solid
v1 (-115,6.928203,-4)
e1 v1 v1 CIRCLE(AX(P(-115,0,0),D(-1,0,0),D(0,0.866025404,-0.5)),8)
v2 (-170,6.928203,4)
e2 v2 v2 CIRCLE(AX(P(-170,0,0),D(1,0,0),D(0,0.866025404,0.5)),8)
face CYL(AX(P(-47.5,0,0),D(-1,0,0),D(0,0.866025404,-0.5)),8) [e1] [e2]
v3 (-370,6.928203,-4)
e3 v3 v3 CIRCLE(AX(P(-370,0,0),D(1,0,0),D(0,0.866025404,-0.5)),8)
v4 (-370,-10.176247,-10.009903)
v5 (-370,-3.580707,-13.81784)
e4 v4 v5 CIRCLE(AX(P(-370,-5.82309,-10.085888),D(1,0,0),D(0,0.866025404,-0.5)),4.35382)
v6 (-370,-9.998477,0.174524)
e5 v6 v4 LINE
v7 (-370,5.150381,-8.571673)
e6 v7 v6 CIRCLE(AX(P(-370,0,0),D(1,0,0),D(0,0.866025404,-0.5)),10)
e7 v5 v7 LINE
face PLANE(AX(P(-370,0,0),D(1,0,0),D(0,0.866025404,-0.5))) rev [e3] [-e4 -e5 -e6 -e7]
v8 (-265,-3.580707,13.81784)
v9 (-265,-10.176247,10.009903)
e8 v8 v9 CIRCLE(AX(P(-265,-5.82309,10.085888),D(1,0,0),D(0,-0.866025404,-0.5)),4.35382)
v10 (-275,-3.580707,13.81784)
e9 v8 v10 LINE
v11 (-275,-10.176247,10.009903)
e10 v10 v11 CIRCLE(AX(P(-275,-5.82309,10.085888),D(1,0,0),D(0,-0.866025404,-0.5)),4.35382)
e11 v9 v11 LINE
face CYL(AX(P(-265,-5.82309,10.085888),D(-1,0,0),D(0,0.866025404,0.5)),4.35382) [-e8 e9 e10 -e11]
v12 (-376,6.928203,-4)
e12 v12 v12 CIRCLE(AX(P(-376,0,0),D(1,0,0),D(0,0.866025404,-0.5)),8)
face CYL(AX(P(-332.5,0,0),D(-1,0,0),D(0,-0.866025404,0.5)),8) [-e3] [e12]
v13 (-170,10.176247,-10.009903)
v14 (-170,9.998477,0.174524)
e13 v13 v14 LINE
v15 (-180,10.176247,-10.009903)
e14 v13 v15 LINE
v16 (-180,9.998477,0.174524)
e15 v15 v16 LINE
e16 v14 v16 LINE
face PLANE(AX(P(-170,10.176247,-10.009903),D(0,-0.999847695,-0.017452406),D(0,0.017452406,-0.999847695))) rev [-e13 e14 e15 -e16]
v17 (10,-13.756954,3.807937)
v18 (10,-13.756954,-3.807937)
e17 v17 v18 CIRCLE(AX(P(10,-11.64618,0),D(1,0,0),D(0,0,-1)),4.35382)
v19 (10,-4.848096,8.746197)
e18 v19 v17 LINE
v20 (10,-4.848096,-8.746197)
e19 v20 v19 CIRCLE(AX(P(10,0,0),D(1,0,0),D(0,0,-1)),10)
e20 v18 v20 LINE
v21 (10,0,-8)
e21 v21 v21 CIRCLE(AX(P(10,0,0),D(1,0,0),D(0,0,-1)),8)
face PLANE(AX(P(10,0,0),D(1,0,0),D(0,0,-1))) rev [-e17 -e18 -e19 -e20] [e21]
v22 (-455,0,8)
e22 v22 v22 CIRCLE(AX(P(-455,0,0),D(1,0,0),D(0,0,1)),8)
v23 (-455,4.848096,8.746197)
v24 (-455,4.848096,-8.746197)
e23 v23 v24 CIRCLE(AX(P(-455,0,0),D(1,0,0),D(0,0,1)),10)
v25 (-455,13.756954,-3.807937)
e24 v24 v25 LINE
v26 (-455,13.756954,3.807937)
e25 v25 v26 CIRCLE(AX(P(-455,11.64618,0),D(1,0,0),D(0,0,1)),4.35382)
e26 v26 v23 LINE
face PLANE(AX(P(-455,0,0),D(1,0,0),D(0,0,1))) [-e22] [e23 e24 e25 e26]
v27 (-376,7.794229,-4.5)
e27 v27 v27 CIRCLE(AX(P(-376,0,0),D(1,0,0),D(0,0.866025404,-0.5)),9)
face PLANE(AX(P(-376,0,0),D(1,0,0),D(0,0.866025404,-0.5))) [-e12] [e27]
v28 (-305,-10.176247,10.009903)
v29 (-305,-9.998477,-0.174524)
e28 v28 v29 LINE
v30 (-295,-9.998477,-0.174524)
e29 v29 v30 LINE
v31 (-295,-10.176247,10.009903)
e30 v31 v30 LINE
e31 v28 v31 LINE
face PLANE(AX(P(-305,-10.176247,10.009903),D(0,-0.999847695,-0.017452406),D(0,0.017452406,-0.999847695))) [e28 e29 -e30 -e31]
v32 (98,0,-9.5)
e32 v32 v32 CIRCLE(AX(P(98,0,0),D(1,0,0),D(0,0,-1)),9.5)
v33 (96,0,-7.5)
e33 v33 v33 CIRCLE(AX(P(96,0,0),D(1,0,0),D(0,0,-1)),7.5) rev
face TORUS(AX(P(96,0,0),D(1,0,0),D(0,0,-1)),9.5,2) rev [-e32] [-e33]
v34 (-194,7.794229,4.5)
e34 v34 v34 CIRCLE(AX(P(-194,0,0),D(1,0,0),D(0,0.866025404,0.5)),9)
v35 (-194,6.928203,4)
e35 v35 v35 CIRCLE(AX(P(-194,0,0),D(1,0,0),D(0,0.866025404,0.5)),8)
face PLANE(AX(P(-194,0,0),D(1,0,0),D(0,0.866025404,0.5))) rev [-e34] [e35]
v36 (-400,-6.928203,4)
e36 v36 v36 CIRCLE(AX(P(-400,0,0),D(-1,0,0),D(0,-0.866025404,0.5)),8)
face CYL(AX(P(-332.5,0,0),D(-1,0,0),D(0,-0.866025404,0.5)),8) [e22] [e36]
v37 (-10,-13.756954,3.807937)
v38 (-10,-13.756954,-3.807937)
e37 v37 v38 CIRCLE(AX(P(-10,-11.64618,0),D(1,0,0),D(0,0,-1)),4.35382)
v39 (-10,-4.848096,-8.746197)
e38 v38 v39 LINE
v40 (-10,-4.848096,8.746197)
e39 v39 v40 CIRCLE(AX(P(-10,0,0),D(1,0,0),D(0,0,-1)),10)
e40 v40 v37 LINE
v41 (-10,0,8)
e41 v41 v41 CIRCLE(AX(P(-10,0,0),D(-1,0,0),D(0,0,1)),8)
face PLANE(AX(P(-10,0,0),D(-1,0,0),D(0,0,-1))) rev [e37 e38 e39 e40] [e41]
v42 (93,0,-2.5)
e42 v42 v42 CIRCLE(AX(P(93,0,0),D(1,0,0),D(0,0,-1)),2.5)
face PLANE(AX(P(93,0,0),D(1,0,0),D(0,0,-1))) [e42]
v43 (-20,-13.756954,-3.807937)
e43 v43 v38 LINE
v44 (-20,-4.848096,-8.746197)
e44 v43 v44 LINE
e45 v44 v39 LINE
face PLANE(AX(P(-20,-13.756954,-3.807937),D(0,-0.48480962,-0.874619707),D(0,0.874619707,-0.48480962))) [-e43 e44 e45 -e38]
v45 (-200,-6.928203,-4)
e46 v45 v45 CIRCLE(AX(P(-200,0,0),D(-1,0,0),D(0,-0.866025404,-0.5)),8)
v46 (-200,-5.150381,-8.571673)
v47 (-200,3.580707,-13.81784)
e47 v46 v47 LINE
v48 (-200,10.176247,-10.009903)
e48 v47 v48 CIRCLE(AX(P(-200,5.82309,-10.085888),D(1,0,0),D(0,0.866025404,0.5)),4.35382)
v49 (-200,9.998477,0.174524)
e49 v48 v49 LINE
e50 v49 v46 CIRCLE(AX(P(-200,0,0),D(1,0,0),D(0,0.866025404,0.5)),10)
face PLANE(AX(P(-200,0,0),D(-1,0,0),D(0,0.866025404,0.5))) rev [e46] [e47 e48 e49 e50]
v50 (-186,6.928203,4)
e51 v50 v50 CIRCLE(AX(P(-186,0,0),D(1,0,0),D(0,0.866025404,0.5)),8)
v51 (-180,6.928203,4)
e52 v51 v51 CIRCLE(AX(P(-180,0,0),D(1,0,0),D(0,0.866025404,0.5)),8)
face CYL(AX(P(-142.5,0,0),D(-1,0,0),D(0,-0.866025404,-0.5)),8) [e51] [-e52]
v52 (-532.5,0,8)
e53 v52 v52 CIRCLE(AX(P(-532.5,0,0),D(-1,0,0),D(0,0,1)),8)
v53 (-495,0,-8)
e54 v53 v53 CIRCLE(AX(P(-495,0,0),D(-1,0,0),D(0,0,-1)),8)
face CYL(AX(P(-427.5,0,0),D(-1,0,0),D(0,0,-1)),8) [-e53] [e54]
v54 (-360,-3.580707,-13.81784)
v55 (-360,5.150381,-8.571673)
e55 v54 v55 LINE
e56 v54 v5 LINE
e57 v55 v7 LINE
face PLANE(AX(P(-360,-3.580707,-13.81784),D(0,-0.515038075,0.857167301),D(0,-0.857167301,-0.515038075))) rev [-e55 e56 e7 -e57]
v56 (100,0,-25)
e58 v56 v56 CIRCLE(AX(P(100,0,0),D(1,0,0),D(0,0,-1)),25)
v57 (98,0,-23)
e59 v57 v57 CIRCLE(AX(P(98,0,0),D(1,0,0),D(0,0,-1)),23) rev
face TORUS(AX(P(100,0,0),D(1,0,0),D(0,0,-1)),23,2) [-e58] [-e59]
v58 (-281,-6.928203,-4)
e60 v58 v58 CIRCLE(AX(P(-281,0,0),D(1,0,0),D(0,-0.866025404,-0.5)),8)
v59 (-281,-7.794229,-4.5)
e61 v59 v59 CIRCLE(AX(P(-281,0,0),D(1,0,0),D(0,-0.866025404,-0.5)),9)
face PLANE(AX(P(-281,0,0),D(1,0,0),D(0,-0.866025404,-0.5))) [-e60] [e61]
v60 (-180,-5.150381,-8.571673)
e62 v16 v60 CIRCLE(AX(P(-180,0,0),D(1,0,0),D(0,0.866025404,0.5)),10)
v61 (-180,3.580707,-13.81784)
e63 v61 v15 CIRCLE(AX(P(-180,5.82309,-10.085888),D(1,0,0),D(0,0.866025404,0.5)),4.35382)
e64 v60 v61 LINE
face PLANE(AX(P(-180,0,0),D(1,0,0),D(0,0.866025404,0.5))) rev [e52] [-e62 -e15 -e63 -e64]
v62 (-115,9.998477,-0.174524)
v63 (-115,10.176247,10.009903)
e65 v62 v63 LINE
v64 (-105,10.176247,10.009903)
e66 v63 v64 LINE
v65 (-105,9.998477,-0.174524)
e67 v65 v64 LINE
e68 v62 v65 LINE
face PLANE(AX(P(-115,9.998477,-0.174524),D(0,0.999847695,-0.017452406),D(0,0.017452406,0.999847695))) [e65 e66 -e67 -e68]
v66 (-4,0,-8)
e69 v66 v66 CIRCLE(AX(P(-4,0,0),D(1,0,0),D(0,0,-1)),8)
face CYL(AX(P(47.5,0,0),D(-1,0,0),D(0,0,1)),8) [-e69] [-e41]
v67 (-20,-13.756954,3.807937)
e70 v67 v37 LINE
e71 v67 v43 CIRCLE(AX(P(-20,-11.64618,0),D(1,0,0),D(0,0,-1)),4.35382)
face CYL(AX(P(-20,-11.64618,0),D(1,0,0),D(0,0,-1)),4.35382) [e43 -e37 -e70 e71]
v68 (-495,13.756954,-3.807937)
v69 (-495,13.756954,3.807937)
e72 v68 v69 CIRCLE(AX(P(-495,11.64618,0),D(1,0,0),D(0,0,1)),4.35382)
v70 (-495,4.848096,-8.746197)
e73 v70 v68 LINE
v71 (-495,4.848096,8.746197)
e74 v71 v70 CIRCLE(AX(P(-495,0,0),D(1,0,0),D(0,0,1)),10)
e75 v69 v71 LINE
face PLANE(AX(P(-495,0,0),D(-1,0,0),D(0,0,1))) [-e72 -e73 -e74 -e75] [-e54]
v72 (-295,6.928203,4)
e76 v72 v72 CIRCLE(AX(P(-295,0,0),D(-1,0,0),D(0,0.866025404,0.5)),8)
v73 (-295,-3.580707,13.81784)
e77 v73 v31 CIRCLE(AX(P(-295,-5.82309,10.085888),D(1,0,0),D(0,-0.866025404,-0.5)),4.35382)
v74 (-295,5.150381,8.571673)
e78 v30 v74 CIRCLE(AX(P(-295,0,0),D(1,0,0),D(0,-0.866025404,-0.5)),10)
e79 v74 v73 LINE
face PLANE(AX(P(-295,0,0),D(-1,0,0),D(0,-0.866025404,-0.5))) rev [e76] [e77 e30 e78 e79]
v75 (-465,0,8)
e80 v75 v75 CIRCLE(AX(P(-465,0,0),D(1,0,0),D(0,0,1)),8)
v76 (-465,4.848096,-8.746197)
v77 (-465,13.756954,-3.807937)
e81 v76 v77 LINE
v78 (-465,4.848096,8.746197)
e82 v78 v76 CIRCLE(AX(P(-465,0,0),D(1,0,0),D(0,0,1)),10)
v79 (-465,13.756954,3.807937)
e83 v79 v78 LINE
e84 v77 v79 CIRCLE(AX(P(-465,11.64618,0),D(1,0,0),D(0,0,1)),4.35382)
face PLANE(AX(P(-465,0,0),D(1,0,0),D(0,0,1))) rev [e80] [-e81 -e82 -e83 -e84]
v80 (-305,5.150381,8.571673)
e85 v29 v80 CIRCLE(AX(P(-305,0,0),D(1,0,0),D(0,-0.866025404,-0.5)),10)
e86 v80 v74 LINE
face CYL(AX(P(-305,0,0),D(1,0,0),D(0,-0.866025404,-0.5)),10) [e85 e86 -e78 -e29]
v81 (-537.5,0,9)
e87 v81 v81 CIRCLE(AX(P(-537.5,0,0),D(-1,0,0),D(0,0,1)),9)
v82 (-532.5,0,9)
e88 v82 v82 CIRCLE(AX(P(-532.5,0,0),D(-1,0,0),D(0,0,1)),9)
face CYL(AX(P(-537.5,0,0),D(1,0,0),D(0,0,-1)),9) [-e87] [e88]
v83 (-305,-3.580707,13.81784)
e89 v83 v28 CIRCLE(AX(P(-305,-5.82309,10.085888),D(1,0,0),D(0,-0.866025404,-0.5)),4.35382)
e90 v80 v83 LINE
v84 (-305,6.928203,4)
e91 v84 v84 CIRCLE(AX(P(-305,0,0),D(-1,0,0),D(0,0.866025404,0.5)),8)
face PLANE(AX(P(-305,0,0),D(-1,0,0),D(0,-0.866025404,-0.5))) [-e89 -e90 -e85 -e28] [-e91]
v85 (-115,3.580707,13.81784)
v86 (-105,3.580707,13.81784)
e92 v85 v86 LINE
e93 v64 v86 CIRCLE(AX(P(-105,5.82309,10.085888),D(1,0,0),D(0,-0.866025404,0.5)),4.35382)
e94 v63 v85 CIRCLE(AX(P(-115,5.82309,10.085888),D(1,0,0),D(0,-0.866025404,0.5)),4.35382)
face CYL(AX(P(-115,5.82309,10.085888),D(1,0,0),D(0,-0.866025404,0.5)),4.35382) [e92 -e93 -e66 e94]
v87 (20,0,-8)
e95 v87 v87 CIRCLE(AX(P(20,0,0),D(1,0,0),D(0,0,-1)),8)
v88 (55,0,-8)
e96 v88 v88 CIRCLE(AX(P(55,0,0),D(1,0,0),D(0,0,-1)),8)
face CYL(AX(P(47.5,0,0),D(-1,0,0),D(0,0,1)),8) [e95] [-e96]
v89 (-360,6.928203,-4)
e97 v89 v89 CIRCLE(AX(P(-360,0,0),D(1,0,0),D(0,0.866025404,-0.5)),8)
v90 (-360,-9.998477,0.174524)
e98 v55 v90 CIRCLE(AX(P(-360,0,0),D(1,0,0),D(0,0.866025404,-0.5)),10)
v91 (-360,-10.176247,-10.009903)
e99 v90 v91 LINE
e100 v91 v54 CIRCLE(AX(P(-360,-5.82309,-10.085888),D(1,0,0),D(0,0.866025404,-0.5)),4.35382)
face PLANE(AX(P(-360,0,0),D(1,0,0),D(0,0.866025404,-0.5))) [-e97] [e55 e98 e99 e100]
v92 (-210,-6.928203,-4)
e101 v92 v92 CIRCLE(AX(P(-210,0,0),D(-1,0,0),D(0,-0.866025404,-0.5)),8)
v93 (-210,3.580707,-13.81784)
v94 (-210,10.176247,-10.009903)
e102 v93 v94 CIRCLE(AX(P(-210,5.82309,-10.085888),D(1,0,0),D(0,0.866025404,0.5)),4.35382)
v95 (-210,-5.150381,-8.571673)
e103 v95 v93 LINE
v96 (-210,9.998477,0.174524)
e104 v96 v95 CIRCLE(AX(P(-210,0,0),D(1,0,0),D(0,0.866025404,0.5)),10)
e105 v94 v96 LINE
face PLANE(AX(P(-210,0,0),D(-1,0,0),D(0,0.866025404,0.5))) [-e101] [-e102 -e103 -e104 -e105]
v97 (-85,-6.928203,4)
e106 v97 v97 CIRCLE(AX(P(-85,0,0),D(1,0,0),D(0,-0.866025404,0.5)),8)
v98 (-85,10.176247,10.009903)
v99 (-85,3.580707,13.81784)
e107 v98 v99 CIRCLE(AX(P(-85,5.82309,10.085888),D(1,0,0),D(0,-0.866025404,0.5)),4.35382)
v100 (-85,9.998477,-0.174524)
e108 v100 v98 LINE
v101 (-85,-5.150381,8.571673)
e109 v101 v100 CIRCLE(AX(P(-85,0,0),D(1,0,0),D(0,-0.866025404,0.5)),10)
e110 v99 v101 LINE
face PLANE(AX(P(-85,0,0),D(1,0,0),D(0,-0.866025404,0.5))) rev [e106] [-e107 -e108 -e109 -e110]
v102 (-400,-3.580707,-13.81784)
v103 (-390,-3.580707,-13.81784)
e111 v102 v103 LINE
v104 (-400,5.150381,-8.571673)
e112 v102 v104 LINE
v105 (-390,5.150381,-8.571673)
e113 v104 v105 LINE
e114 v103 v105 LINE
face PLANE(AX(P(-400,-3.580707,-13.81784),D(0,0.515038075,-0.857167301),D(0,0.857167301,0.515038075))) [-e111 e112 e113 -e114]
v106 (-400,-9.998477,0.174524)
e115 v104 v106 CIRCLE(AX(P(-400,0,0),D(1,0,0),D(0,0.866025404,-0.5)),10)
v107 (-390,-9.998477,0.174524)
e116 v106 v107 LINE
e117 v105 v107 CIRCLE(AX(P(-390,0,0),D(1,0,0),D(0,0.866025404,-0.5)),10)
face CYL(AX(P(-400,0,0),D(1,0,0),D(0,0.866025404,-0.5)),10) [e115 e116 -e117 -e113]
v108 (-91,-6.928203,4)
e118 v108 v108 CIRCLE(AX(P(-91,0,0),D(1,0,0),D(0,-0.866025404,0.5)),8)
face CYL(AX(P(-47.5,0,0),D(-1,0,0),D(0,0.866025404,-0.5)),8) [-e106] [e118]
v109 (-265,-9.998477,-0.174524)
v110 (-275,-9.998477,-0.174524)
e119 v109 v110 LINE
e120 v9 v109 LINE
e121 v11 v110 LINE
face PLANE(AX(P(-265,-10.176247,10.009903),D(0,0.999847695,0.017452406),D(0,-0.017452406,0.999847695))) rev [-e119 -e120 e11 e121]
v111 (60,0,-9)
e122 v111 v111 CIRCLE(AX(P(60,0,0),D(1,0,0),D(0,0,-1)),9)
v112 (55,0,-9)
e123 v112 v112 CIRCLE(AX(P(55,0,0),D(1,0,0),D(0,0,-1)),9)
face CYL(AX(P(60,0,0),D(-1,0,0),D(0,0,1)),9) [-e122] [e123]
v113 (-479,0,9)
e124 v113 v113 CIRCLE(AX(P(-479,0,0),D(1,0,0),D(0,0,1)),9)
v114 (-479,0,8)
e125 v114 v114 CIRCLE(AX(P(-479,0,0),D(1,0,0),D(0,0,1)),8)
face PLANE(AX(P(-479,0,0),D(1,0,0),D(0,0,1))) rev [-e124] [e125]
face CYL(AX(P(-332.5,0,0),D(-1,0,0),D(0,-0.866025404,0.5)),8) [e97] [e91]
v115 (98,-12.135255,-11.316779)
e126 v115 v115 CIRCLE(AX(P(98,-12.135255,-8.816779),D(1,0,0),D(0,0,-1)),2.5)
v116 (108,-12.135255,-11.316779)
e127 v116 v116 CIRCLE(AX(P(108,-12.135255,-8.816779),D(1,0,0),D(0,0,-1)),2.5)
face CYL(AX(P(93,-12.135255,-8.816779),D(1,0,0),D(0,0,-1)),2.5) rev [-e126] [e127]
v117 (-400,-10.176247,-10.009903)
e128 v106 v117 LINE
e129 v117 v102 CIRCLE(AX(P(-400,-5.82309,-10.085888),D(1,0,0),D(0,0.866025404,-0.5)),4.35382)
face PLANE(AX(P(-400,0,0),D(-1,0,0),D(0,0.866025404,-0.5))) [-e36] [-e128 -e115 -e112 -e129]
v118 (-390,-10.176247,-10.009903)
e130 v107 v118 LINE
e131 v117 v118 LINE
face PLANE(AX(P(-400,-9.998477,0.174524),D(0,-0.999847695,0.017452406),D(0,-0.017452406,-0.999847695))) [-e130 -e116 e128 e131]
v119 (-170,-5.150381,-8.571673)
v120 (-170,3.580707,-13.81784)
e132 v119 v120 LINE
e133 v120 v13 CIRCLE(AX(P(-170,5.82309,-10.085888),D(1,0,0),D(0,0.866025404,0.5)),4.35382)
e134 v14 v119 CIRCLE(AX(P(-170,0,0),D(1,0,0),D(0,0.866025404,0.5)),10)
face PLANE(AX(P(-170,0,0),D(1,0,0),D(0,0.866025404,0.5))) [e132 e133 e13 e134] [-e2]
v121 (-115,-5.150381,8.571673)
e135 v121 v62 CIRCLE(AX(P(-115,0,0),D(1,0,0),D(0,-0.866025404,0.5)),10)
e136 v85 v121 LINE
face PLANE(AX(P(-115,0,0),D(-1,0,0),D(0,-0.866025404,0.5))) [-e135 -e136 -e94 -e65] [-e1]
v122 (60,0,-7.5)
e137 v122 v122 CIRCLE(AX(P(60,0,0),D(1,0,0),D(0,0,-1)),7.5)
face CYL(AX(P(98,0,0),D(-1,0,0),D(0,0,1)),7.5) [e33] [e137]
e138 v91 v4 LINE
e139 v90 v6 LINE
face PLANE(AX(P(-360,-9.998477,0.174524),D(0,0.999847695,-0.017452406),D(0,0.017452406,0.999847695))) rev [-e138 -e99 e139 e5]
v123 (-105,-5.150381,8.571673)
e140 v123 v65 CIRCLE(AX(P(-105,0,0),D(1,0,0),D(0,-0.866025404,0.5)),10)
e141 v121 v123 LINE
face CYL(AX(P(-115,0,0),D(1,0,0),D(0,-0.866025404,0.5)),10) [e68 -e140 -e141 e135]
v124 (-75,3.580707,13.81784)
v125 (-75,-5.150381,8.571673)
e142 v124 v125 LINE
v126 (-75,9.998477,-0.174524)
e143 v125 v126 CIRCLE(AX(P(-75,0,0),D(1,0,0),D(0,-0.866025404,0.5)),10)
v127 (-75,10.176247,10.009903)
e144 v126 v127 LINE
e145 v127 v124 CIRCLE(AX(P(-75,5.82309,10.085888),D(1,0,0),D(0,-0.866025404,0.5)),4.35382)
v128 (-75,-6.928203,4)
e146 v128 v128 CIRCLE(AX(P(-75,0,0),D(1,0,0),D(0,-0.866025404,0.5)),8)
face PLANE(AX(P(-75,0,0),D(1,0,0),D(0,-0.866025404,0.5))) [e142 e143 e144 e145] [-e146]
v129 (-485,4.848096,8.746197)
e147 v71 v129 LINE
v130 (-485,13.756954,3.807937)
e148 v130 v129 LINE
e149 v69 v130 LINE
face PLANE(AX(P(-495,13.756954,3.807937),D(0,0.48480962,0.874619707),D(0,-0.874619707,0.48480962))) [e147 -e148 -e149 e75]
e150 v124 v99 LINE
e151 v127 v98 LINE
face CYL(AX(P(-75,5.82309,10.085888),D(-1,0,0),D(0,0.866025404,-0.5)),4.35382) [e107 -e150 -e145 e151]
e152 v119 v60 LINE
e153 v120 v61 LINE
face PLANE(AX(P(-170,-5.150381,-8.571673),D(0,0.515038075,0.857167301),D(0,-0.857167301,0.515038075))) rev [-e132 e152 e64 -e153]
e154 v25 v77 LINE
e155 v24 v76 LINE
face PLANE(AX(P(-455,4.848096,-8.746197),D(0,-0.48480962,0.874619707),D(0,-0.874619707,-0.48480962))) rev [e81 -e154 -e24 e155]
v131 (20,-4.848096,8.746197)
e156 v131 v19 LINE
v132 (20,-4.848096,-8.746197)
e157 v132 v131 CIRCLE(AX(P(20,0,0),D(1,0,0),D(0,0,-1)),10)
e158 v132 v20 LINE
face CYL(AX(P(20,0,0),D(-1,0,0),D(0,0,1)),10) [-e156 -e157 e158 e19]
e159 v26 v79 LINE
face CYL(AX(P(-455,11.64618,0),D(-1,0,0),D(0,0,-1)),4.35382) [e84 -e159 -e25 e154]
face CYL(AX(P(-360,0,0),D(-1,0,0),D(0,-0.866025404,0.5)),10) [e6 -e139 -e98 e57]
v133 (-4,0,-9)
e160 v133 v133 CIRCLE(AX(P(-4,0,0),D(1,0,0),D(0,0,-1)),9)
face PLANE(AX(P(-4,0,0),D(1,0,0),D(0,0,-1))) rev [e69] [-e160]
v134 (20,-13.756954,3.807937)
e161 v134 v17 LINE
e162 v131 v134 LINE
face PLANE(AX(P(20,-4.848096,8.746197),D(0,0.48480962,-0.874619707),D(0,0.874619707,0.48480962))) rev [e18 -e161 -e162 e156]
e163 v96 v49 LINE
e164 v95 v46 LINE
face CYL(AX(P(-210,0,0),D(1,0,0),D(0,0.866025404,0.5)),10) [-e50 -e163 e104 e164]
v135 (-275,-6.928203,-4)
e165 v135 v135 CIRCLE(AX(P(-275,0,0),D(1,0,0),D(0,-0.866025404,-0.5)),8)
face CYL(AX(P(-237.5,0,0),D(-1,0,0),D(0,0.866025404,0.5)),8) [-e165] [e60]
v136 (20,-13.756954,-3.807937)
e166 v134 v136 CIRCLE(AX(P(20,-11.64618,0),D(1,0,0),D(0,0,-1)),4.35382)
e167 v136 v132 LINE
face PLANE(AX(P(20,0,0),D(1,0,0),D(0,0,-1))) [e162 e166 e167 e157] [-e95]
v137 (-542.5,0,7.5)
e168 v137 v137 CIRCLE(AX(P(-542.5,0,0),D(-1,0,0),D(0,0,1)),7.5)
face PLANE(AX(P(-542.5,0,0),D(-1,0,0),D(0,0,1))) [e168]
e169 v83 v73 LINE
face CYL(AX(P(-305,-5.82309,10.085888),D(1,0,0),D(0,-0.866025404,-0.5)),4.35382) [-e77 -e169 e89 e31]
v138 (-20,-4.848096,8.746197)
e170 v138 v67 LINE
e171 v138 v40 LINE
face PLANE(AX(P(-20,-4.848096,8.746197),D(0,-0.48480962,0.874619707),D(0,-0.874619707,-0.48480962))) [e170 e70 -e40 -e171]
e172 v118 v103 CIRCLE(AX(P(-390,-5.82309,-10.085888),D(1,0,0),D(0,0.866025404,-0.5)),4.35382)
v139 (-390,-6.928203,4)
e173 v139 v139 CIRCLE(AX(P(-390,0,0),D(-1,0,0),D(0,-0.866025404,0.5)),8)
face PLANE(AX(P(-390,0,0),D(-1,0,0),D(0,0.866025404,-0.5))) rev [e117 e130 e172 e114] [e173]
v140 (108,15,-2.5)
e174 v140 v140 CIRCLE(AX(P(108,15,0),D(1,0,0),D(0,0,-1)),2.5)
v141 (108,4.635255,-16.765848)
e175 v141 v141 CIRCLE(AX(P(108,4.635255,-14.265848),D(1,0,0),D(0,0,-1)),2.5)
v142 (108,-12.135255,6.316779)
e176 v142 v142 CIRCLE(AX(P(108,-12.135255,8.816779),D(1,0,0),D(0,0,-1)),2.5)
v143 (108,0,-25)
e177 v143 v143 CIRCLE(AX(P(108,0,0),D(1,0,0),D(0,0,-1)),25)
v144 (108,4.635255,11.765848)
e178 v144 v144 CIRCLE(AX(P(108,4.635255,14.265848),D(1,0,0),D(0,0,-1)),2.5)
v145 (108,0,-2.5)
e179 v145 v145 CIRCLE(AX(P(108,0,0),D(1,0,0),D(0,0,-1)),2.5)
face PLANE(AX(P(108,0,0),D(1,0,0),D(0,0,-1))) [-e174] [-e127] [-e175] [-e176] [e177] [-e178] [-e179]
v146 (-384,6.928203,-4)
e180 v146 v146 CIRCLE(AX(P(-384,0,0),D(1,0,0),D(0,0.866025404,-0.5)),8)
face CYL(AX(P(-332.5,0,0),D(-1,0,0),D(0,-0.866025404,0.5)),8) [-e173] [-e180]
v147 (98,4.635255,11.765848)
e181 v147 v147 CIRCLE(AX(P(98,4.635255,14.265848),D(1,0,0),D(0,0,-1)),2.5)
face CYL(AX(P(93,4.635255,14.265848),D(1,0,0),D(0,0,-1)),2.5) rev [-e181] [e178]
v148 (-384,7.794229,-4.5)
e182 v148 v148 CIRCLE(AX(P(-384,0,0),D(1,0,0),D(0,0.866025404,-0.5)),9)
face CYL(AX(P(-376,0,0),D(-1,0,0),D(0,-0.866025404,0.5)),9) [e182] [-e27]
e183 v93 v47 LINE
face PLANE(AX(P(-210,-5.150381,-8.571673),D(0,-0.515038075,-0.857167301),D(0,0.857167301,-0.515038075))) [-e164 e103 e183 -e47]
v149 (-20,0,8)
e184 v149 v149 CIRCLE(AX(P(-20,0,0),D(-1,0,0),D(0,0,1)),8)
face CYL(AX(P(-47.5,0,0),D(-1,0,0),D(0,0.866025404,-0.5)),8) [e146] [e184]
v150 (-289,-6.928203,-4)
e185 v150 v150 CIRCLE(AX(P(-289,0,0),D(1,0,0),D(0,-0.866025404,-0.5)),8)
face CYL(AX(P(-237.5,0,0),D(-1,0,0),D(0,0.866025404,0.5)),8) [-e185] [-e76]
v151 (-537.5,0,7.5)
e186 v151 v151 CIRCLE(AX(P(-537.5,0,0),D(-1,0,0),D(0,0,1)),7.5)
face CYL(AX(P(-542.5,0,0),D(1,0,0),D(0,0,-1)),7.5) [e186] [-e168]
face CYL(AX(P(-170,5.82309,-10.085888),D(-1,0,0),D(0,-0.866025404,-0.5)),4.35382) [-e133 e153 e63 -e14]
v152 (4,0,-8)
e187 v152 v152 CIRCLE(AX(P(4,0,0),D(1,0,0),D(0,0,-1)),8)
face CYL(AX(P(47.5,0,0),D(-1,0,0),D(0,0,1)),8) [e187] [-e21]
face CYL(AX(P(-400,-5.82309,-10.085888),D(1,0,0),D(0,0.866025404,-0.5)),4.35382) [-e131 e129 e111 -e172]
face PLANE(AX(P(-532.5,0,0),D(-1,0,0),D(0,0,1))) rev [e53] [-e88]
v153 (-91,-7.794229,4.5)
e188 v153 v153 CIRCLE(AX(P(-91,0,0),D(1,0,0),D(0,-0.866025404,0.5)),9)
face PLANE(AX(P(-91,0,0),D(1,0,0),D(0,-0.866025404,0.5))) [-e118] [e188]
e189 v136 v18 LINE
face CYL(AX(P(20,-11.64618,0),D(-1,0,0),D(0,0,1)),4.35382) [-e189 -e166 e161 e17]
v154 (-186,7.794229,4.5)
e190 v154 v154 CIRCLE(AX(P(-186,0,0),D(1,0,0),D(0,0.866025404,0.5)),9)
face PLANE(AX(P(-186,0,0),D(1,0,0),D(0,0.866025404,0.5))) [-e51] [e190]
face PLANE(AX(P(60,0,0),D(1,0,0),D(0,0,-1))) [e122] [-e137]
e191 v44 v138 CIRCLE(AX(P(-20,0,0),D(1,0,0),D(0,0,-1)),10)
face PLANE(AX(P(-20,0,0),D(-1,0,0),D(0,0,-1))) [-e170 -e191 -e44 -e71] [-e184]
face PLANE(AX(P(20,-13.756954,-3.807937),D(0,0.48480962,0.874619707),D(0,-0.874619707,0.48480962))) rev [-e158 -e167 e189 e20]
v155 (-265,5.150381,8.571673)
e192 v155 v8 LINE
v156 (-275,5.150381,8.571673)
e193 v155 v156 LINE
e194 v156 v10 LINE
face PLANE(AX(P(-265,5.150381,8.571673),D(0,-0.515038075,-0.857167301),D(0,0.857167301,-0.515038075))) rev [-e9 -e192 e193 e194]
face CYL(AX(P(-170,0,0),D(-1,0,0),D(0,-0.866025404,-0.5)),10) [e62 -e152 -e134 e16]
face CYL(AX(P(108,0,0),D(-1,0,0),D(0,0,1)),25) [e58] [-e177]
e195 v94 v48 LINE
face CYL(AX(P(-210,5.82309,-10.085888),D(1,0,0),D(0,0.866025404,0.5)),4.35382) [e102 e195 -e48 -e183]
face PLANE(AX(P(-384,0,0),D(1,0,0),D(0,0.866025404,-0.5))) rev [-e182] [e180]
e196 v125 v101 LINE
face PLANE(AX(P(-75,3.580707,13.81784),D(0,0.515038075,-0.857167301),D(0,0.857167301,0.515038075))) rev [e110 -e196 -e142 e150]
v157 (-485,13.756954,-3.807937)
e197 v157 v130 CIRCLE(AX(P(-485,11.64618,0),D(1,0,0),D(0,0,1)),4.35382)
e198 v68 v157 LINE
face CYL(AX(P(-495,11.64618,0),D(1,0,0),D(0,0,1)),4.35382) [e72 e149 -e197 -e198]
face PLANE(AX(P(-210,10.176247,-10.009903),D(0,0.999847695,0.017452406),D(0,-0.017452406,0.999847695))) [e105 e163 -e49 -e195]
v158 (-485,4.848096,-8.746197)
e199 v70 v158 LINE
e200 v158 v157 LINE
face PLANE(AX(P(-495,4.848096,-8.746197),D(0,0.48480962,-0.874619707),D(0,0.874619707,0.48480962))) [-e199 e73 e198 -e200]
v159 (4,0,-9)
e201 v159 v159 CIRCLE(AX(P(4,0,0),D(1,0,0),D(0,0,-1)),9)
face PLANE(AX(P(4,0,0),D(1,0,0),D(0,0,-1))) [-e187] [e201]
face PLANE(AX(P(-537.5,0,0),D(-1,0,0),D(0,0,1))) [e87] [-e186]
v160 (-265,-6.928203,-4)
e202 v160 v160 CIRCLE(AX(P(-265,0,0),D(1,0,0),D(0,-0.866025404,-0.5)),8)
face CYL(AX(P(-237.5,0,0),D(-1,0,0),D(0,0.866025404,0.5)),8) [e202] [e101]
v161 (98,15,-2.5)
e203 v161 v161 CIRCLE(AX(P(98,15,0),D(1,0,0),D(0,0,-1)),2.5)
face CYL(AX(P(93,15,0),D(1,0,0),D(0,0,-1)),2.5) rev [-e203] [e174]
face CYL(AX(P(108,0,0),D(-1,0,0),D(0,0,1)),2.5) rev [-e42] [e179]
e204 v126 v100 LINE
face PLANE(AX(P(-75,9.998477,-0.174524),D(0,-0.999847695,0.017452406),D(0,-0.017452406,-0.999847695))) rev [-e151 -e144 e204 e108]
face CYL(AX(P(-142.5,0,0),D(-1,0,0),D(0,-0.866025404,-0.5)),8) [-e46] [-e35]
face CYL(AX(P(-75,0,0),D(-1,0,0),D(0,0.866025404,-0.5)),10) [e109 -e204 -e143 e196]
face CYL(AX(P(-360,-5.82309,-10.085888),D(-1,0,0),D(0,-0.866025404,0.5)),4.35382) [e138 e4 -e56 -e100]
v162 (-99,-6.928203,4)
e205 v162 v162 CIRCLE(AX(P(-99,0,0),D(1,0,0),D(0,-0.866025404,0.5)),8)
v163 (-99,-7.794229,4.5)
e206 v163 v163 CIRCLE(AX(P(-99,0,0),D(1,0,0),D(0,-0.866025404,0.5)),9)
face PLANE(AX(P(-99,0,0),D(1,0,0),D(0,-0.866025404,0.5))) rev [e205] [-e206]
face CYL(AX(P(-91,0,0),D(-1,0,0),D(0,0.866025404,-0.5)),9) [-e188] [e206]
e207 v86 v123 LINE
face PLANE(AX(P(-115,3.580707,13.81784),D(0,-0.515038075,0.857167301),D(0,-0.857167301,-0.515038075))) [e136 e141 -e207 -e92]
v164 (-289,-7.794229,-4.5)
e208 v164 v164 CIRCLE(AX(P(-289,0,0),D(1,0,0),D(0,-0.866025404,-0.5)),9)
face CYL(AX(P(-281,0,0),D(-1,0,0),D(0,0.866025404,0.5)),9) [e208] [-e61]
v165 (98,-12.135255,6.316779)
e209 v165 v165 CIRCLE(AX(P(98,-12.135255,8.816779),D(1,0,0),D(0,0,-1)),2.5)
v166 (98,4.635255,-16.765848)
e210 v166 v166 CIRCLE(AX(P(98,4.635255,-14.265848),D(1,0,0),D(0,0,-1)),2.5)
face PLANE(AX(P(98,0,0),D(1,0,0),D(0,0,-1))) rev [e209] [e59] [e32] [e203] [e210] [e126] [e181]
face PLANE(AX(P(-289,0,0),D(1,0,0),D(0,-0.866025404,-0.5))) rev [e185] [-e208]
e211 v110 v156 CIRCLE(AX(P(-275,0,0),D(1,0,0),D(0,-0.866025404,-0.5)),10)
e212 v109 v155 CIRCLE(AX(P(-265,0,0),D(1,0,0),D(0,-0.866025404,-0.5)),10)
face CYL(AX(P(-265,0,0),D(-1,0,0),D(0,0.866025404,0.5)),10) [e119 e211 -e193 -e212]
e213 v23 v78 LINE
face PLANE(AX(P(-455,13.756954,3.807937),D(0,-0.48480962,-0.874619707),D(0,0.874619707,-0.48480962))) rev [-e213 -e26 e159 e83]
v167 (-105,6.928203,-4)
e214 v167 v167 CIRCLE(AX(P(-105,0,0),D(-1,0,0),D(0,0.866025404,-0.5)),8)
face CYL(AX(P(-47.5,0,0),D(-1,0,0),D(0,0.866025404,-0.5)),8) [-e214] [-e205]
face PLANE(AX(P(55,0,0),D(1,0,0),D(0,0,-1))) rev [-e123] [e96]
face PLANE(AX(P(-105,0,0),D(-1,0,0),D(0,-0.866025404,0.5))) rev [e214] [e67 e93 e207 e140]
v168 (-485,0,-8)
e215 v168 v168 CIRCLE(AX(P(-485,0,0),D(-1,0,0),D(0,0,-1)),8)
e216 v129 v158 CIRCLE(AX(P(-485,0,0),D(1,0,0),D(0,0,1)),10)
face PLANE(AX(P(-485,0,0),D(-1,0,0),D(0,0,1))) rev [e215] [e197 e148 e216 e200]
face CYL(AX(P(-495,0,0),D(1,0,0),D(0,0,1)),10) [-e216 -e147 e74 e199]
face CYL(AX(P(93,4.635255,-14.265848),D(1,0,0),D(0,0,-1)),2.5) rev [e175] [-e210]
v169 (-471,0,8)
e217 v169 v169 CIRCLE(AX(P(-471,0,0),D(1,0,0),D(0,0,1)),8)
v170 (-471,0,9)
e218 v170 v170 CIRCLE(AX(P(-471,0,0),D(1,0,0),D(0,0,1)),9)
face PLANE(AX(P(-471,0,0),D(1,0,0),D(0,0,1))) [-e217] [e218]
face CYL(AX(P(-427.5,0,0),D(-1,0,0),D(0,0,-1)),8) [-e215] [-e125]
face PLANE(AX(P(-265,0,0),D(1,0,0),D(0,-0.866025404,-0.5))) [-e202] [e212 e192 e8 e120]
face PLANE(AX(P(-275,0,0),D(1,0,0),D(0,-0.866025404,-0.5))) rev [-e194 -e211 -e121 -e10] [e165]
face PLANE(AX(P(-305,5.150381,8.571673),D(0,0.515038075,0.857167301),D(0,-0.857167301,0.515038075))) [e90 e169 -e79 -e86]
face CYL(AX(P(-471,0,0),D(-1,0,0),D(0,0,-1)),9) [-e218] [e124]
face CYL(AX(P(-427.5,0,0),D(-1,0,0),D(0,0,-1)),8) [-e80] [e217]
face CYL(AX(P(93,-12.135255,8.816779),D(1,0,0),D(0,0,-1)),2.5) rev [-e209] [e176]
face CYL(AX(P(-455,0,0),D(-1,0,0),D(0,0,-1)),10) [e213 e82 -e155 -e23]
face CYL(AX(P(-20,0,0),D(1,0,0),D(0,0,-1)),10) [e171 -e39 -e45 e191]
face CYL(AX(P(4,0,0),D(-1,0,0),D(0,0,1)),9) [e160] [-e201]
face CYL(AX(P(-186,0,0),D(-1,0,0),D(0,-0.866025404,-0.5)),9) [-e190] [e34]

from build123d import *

# Parameters (mm, degrees)
SKETCH1_R             = 8
BOSS_EXTRUDE1_DEPTH   = 47.5
BOSS_EXTRUDE2_START   = 10
BOSS_EXTRUDE2_DEPTH   = 10
SKETCH3_R             = 9
BOSS_EXTRUDE3_DEPTH   = 4
LPATTERN1_COUNT       = 6
LPATTERN1_PITCH       = 95
BODY_MOVE_COPY1_ANGLE = 60
BODY_MOVE_COPY2_ANGLE = 120
BODY_MOVE_COPY3_ANGLE = 60
BODY_MOVE_COPY4_ANGLE = 120
BODY_MOVE_COPY5_ANGLE = 180
SKETCH4_R             = 8
BOSS_EXTRUDE4_DEPTH   = 10
SKETCH5_R             = 9
BOSS_EXTRUDE5_DEPTH   = 5
SKETCH6_R             = 7.5
BOSS_EXTRUDE6_DEPTH   = 5
SKETCH7_R             = 8
BOSS_EXTRUDE7_DEPTH   = 7.5
SKETCH8_R             = 9
BOSS_EXTRUDE8_DEPTH   = 5
SKETCH9_R             = 7.5
BOSS_EXTRUDE9_DEPTH   = 38
SKETCH10_R            = 25
SKETCH10_R_2          = 2.5
BOSS_EXTRUDE10_DEPTH  = 10
SKETCH11_R            = 2.5
CUT_EXTRUDE1_DEPTH    = 15
FILLET1_R             = 2


with BuildPart() as part:
    # Sketch1 → Boss-Extrude1 (new, symmetric)
    with BuildSketch(Plane(origin=(0, 0, 0), x_dir=(0, 0, -1), z_dir=(1, 0, 0))):
        Circle(SKETCH1_R)
    extrude(amount=BOSS_EXTRUDE1_DEPTH, both=True)

    # Sketch2 → Boss-Extrude2 (add)
    with BuildSketch(Plane(origin=(0, 0, 0), x_dir=(0, 0, -1), z_dir=(1, 0, 0)).offset(BOSS_EXTRUDE2_START)):
        with BuildLine():
            Line((-8.746197071, -4.848096202), (-3.807936598, -13.756953924))
            ThreePointArc((-3.807936598, -13.756953924), (0, -16), (3.807936598, -13.756953924))
            Line((3.807936598, -13.756953924), (8.746197071, -4.848096202))
            ThreePointArc((8.746197071, -4.848096202), (0, 10), (-8.746197071, -4.848096202))
        make_face()
    boss_extrude2 = extrude(amount=BOSS_EXTRUDE2_DEPTH)

    # Mirror1: Boss-Extrude2 across plane
    add(boss_extrude2.mirror(Plane(origin=(0, 0, 0), x_dir=(0, 0, 1), z_dir=(1, 0, 0))))

    # Sketch3 → Boss-Extrude3 (add, symmetric)
    with BuildSketch(Plane(origin=(0, 0, 0), x_dir=(0, 0, -1), z_dir=(1, 0, 0))):
        Circle(SKETCH3_R)
    extrude(amount=BOSS_EXTRUDE3_DEPTH, both=True)


with BuildPart() as lpattern1_1:
    # LPattern1: pattern copy
    add(part.part.moved(Location(Vector(-1, 0, 0) * (1 * LPATTERN1_PITCH))))


with BuildPart() as lpattern1_2:
    # LPattern1: pattern copy
    add(part.part.moved(Location(Vector(-1, 0, 0) * (2 * LPATTERN1_PITCH))))


with BuildPart() as lpattern1_3:
    # LPattern1: pattern copy
    add(part.part.moved(Location(Vector(-1, 0, 0) * (3 * LPATTERN1_PITCH))))


with BuildPart() as lpattern1_4:
    # LPattern1: pattern copy
    add(part.part.moved(Location(Vector(-1, 0, 0) * (4 * LPATTERN1_PITCH))))


with BuildPart() as lpattern1_5:
    # LPattern1: pattern copy
    add(part.part.moved(Location(Vector(-1, 0, 0) * (5 * LPATTERN1_PITCH))))


with BuildPart() as lpattern1_3_1:
    # Body-Move/Copy1: moved
    add(lpattern1_3.part.rotate(Axis((0, 0, 0), (-1, 0, 0)), BODY_MOVE_COPY1_ANGLE))


with BuildPart() as lpattern1_1_1:
    # Body-Move/Copy2: moved
    add(lpattern1_1.part.rotate(Axis((0, 0, 0), (-1, 0, 0)), BODY_MOVE_COPY2_ANGLE))


with BuildPart() as lpattern1_4_1:
    # Body-Move/Copy3: moved
    add(lpattern1_4.part.rotate(Axis((0, 0, 0), (1, 0, 0)), BODY_MOVE_COPY3_ANGLE))


with BuildPart() as lpattern1_2_1:
    # Body-Move/Copy4: moved
    add(lpattern1_2.part.rotate(Axis((0, 0, 0), (1, 0, 0)), BODY_MOVE_COPY4_ANGLE))


with BuildPart() as lpattern1_5_1:
    # Body-Move/Copy5: moved
    add(lpattern1_5.part.rotate(Axis((0, 0, 0), (1, 0, 0)), BODY_MOVE_COPY5_ANGLE))

    # Sketch4 → Boss-Extrude4 (add)
    with BuildSketch(Plane.ZY.offset(522.5)):
        Circle(SKETCH4_R)
    extrude(amount=BOSS_EXTRUDE4_DEPTH)

    # Sketch5 → Boss-Extrude5 (add)
    with BuildSketch(Plane.ZY.offset(532.5)):
        Circle(SKETCH5_R)
    extrude(amount=BOSS_EXTRUDE5_DEPTH)


with BuildPart() as lpattern1_4_2:
    add(lpattern1_4_1.part)

    # Combine1: union LPattern1_1, LPattern1_3, LPattern1_2, part, LPattern1_5
    add(lpattern1_1_1.part)
    add(lpattern1_3_1.part)
    add(lpattern1_2_1.part)
    add(part.part)
    add(lpattern1_5_1.part)

    # Sketch6 → Boss-Extrude6 (add)
    with BuildSketch(Plane.ZY.offset(537.5)):
        Circle(SKETCH6_R)
    extrude(amount=BOSS_EXTRUDE6_DEPTH)

    # Sketch7 → Boss-Extrude7 (add)
    with BuildSketch(Plane(origin=(47.5, 0, 0), x_dir=(0, 0, -1), z_dir=(1, 0, 0))):
        Circle(SKETCH7_R)
    extrude(amount=BOSS_EXTRUDE7_DEPTH)

    # Sketch8 → Boss-Extrude8 (add)
    with BuildSketch(Plane(origin=(55, 0, 0), x_dir=(0, 0, -1), z_dir=(1, 0, 0))):
        Circle(SKETCH8_R)
    extrude(amount=BOSS_EXTRUDE8_DEPTH)

    # Sketch9 → Boss-Extrude9 (add)
    with BuildSketch(Plane(origin=(60, 0, 0), x_dir=(0, 0, -1), z_dir=(1, 0, 0))):
        Circle(SKETCH9_R)
    extrude(amount=BOSS_EXTRUDE9_DEPTH)

    # Sketch10 → Boss-Extrude10 (add)
    with BuildSketch(Plane(origin=(98, 0, 0), x_dir=(0, 0, -1), z_dir=(1, 0, 0))):
        Circle(SKETCH10_R)
        Circle(SKETCH10_R_2, mode=Mode.SUBTRACT)
    extrude(amount=BOSS_EXTRUDE10_DEPTH)

    # Sketch11 → Cut-Extrude1 (cut)
    with BuildSketch(Plane(origin=(108, 0, 0), x_dir=(0, 0, -1), z_dir=(1, 0, 0))):
        with Locations((0, 15)):
            Circle(SKETCH11_R)
        Circle(SKETCH11_R)
        with Locations((14.265847744, 4.635254916)):
            Circle(SKETCH11_R)
        with Locations((8.816778784, -12.135254916)):
            Circle(SKETCH11_R)
        with Locations((-8.816778784, -12.135254916)):
            Circle(SKETCH11_R)
        with Locations((-14.265847744, 4.635254916)):
            Circle(SKETCH11_R)
    extrude(amount=-CUT_EXTRUDE1_DEPTH, mode=Mode.SUBTRACT)

    # Fillet1
    fillet1_edges = [lpattern1_4_2.edges().sort_by_distance(p)[0] for p in [
        (98, 0, 25),
        (98, 0, 7.5),
    ]]
    fillet(fillet1_edges, radius=FILLET1_R)


solid = lpattern1_4_2.part
